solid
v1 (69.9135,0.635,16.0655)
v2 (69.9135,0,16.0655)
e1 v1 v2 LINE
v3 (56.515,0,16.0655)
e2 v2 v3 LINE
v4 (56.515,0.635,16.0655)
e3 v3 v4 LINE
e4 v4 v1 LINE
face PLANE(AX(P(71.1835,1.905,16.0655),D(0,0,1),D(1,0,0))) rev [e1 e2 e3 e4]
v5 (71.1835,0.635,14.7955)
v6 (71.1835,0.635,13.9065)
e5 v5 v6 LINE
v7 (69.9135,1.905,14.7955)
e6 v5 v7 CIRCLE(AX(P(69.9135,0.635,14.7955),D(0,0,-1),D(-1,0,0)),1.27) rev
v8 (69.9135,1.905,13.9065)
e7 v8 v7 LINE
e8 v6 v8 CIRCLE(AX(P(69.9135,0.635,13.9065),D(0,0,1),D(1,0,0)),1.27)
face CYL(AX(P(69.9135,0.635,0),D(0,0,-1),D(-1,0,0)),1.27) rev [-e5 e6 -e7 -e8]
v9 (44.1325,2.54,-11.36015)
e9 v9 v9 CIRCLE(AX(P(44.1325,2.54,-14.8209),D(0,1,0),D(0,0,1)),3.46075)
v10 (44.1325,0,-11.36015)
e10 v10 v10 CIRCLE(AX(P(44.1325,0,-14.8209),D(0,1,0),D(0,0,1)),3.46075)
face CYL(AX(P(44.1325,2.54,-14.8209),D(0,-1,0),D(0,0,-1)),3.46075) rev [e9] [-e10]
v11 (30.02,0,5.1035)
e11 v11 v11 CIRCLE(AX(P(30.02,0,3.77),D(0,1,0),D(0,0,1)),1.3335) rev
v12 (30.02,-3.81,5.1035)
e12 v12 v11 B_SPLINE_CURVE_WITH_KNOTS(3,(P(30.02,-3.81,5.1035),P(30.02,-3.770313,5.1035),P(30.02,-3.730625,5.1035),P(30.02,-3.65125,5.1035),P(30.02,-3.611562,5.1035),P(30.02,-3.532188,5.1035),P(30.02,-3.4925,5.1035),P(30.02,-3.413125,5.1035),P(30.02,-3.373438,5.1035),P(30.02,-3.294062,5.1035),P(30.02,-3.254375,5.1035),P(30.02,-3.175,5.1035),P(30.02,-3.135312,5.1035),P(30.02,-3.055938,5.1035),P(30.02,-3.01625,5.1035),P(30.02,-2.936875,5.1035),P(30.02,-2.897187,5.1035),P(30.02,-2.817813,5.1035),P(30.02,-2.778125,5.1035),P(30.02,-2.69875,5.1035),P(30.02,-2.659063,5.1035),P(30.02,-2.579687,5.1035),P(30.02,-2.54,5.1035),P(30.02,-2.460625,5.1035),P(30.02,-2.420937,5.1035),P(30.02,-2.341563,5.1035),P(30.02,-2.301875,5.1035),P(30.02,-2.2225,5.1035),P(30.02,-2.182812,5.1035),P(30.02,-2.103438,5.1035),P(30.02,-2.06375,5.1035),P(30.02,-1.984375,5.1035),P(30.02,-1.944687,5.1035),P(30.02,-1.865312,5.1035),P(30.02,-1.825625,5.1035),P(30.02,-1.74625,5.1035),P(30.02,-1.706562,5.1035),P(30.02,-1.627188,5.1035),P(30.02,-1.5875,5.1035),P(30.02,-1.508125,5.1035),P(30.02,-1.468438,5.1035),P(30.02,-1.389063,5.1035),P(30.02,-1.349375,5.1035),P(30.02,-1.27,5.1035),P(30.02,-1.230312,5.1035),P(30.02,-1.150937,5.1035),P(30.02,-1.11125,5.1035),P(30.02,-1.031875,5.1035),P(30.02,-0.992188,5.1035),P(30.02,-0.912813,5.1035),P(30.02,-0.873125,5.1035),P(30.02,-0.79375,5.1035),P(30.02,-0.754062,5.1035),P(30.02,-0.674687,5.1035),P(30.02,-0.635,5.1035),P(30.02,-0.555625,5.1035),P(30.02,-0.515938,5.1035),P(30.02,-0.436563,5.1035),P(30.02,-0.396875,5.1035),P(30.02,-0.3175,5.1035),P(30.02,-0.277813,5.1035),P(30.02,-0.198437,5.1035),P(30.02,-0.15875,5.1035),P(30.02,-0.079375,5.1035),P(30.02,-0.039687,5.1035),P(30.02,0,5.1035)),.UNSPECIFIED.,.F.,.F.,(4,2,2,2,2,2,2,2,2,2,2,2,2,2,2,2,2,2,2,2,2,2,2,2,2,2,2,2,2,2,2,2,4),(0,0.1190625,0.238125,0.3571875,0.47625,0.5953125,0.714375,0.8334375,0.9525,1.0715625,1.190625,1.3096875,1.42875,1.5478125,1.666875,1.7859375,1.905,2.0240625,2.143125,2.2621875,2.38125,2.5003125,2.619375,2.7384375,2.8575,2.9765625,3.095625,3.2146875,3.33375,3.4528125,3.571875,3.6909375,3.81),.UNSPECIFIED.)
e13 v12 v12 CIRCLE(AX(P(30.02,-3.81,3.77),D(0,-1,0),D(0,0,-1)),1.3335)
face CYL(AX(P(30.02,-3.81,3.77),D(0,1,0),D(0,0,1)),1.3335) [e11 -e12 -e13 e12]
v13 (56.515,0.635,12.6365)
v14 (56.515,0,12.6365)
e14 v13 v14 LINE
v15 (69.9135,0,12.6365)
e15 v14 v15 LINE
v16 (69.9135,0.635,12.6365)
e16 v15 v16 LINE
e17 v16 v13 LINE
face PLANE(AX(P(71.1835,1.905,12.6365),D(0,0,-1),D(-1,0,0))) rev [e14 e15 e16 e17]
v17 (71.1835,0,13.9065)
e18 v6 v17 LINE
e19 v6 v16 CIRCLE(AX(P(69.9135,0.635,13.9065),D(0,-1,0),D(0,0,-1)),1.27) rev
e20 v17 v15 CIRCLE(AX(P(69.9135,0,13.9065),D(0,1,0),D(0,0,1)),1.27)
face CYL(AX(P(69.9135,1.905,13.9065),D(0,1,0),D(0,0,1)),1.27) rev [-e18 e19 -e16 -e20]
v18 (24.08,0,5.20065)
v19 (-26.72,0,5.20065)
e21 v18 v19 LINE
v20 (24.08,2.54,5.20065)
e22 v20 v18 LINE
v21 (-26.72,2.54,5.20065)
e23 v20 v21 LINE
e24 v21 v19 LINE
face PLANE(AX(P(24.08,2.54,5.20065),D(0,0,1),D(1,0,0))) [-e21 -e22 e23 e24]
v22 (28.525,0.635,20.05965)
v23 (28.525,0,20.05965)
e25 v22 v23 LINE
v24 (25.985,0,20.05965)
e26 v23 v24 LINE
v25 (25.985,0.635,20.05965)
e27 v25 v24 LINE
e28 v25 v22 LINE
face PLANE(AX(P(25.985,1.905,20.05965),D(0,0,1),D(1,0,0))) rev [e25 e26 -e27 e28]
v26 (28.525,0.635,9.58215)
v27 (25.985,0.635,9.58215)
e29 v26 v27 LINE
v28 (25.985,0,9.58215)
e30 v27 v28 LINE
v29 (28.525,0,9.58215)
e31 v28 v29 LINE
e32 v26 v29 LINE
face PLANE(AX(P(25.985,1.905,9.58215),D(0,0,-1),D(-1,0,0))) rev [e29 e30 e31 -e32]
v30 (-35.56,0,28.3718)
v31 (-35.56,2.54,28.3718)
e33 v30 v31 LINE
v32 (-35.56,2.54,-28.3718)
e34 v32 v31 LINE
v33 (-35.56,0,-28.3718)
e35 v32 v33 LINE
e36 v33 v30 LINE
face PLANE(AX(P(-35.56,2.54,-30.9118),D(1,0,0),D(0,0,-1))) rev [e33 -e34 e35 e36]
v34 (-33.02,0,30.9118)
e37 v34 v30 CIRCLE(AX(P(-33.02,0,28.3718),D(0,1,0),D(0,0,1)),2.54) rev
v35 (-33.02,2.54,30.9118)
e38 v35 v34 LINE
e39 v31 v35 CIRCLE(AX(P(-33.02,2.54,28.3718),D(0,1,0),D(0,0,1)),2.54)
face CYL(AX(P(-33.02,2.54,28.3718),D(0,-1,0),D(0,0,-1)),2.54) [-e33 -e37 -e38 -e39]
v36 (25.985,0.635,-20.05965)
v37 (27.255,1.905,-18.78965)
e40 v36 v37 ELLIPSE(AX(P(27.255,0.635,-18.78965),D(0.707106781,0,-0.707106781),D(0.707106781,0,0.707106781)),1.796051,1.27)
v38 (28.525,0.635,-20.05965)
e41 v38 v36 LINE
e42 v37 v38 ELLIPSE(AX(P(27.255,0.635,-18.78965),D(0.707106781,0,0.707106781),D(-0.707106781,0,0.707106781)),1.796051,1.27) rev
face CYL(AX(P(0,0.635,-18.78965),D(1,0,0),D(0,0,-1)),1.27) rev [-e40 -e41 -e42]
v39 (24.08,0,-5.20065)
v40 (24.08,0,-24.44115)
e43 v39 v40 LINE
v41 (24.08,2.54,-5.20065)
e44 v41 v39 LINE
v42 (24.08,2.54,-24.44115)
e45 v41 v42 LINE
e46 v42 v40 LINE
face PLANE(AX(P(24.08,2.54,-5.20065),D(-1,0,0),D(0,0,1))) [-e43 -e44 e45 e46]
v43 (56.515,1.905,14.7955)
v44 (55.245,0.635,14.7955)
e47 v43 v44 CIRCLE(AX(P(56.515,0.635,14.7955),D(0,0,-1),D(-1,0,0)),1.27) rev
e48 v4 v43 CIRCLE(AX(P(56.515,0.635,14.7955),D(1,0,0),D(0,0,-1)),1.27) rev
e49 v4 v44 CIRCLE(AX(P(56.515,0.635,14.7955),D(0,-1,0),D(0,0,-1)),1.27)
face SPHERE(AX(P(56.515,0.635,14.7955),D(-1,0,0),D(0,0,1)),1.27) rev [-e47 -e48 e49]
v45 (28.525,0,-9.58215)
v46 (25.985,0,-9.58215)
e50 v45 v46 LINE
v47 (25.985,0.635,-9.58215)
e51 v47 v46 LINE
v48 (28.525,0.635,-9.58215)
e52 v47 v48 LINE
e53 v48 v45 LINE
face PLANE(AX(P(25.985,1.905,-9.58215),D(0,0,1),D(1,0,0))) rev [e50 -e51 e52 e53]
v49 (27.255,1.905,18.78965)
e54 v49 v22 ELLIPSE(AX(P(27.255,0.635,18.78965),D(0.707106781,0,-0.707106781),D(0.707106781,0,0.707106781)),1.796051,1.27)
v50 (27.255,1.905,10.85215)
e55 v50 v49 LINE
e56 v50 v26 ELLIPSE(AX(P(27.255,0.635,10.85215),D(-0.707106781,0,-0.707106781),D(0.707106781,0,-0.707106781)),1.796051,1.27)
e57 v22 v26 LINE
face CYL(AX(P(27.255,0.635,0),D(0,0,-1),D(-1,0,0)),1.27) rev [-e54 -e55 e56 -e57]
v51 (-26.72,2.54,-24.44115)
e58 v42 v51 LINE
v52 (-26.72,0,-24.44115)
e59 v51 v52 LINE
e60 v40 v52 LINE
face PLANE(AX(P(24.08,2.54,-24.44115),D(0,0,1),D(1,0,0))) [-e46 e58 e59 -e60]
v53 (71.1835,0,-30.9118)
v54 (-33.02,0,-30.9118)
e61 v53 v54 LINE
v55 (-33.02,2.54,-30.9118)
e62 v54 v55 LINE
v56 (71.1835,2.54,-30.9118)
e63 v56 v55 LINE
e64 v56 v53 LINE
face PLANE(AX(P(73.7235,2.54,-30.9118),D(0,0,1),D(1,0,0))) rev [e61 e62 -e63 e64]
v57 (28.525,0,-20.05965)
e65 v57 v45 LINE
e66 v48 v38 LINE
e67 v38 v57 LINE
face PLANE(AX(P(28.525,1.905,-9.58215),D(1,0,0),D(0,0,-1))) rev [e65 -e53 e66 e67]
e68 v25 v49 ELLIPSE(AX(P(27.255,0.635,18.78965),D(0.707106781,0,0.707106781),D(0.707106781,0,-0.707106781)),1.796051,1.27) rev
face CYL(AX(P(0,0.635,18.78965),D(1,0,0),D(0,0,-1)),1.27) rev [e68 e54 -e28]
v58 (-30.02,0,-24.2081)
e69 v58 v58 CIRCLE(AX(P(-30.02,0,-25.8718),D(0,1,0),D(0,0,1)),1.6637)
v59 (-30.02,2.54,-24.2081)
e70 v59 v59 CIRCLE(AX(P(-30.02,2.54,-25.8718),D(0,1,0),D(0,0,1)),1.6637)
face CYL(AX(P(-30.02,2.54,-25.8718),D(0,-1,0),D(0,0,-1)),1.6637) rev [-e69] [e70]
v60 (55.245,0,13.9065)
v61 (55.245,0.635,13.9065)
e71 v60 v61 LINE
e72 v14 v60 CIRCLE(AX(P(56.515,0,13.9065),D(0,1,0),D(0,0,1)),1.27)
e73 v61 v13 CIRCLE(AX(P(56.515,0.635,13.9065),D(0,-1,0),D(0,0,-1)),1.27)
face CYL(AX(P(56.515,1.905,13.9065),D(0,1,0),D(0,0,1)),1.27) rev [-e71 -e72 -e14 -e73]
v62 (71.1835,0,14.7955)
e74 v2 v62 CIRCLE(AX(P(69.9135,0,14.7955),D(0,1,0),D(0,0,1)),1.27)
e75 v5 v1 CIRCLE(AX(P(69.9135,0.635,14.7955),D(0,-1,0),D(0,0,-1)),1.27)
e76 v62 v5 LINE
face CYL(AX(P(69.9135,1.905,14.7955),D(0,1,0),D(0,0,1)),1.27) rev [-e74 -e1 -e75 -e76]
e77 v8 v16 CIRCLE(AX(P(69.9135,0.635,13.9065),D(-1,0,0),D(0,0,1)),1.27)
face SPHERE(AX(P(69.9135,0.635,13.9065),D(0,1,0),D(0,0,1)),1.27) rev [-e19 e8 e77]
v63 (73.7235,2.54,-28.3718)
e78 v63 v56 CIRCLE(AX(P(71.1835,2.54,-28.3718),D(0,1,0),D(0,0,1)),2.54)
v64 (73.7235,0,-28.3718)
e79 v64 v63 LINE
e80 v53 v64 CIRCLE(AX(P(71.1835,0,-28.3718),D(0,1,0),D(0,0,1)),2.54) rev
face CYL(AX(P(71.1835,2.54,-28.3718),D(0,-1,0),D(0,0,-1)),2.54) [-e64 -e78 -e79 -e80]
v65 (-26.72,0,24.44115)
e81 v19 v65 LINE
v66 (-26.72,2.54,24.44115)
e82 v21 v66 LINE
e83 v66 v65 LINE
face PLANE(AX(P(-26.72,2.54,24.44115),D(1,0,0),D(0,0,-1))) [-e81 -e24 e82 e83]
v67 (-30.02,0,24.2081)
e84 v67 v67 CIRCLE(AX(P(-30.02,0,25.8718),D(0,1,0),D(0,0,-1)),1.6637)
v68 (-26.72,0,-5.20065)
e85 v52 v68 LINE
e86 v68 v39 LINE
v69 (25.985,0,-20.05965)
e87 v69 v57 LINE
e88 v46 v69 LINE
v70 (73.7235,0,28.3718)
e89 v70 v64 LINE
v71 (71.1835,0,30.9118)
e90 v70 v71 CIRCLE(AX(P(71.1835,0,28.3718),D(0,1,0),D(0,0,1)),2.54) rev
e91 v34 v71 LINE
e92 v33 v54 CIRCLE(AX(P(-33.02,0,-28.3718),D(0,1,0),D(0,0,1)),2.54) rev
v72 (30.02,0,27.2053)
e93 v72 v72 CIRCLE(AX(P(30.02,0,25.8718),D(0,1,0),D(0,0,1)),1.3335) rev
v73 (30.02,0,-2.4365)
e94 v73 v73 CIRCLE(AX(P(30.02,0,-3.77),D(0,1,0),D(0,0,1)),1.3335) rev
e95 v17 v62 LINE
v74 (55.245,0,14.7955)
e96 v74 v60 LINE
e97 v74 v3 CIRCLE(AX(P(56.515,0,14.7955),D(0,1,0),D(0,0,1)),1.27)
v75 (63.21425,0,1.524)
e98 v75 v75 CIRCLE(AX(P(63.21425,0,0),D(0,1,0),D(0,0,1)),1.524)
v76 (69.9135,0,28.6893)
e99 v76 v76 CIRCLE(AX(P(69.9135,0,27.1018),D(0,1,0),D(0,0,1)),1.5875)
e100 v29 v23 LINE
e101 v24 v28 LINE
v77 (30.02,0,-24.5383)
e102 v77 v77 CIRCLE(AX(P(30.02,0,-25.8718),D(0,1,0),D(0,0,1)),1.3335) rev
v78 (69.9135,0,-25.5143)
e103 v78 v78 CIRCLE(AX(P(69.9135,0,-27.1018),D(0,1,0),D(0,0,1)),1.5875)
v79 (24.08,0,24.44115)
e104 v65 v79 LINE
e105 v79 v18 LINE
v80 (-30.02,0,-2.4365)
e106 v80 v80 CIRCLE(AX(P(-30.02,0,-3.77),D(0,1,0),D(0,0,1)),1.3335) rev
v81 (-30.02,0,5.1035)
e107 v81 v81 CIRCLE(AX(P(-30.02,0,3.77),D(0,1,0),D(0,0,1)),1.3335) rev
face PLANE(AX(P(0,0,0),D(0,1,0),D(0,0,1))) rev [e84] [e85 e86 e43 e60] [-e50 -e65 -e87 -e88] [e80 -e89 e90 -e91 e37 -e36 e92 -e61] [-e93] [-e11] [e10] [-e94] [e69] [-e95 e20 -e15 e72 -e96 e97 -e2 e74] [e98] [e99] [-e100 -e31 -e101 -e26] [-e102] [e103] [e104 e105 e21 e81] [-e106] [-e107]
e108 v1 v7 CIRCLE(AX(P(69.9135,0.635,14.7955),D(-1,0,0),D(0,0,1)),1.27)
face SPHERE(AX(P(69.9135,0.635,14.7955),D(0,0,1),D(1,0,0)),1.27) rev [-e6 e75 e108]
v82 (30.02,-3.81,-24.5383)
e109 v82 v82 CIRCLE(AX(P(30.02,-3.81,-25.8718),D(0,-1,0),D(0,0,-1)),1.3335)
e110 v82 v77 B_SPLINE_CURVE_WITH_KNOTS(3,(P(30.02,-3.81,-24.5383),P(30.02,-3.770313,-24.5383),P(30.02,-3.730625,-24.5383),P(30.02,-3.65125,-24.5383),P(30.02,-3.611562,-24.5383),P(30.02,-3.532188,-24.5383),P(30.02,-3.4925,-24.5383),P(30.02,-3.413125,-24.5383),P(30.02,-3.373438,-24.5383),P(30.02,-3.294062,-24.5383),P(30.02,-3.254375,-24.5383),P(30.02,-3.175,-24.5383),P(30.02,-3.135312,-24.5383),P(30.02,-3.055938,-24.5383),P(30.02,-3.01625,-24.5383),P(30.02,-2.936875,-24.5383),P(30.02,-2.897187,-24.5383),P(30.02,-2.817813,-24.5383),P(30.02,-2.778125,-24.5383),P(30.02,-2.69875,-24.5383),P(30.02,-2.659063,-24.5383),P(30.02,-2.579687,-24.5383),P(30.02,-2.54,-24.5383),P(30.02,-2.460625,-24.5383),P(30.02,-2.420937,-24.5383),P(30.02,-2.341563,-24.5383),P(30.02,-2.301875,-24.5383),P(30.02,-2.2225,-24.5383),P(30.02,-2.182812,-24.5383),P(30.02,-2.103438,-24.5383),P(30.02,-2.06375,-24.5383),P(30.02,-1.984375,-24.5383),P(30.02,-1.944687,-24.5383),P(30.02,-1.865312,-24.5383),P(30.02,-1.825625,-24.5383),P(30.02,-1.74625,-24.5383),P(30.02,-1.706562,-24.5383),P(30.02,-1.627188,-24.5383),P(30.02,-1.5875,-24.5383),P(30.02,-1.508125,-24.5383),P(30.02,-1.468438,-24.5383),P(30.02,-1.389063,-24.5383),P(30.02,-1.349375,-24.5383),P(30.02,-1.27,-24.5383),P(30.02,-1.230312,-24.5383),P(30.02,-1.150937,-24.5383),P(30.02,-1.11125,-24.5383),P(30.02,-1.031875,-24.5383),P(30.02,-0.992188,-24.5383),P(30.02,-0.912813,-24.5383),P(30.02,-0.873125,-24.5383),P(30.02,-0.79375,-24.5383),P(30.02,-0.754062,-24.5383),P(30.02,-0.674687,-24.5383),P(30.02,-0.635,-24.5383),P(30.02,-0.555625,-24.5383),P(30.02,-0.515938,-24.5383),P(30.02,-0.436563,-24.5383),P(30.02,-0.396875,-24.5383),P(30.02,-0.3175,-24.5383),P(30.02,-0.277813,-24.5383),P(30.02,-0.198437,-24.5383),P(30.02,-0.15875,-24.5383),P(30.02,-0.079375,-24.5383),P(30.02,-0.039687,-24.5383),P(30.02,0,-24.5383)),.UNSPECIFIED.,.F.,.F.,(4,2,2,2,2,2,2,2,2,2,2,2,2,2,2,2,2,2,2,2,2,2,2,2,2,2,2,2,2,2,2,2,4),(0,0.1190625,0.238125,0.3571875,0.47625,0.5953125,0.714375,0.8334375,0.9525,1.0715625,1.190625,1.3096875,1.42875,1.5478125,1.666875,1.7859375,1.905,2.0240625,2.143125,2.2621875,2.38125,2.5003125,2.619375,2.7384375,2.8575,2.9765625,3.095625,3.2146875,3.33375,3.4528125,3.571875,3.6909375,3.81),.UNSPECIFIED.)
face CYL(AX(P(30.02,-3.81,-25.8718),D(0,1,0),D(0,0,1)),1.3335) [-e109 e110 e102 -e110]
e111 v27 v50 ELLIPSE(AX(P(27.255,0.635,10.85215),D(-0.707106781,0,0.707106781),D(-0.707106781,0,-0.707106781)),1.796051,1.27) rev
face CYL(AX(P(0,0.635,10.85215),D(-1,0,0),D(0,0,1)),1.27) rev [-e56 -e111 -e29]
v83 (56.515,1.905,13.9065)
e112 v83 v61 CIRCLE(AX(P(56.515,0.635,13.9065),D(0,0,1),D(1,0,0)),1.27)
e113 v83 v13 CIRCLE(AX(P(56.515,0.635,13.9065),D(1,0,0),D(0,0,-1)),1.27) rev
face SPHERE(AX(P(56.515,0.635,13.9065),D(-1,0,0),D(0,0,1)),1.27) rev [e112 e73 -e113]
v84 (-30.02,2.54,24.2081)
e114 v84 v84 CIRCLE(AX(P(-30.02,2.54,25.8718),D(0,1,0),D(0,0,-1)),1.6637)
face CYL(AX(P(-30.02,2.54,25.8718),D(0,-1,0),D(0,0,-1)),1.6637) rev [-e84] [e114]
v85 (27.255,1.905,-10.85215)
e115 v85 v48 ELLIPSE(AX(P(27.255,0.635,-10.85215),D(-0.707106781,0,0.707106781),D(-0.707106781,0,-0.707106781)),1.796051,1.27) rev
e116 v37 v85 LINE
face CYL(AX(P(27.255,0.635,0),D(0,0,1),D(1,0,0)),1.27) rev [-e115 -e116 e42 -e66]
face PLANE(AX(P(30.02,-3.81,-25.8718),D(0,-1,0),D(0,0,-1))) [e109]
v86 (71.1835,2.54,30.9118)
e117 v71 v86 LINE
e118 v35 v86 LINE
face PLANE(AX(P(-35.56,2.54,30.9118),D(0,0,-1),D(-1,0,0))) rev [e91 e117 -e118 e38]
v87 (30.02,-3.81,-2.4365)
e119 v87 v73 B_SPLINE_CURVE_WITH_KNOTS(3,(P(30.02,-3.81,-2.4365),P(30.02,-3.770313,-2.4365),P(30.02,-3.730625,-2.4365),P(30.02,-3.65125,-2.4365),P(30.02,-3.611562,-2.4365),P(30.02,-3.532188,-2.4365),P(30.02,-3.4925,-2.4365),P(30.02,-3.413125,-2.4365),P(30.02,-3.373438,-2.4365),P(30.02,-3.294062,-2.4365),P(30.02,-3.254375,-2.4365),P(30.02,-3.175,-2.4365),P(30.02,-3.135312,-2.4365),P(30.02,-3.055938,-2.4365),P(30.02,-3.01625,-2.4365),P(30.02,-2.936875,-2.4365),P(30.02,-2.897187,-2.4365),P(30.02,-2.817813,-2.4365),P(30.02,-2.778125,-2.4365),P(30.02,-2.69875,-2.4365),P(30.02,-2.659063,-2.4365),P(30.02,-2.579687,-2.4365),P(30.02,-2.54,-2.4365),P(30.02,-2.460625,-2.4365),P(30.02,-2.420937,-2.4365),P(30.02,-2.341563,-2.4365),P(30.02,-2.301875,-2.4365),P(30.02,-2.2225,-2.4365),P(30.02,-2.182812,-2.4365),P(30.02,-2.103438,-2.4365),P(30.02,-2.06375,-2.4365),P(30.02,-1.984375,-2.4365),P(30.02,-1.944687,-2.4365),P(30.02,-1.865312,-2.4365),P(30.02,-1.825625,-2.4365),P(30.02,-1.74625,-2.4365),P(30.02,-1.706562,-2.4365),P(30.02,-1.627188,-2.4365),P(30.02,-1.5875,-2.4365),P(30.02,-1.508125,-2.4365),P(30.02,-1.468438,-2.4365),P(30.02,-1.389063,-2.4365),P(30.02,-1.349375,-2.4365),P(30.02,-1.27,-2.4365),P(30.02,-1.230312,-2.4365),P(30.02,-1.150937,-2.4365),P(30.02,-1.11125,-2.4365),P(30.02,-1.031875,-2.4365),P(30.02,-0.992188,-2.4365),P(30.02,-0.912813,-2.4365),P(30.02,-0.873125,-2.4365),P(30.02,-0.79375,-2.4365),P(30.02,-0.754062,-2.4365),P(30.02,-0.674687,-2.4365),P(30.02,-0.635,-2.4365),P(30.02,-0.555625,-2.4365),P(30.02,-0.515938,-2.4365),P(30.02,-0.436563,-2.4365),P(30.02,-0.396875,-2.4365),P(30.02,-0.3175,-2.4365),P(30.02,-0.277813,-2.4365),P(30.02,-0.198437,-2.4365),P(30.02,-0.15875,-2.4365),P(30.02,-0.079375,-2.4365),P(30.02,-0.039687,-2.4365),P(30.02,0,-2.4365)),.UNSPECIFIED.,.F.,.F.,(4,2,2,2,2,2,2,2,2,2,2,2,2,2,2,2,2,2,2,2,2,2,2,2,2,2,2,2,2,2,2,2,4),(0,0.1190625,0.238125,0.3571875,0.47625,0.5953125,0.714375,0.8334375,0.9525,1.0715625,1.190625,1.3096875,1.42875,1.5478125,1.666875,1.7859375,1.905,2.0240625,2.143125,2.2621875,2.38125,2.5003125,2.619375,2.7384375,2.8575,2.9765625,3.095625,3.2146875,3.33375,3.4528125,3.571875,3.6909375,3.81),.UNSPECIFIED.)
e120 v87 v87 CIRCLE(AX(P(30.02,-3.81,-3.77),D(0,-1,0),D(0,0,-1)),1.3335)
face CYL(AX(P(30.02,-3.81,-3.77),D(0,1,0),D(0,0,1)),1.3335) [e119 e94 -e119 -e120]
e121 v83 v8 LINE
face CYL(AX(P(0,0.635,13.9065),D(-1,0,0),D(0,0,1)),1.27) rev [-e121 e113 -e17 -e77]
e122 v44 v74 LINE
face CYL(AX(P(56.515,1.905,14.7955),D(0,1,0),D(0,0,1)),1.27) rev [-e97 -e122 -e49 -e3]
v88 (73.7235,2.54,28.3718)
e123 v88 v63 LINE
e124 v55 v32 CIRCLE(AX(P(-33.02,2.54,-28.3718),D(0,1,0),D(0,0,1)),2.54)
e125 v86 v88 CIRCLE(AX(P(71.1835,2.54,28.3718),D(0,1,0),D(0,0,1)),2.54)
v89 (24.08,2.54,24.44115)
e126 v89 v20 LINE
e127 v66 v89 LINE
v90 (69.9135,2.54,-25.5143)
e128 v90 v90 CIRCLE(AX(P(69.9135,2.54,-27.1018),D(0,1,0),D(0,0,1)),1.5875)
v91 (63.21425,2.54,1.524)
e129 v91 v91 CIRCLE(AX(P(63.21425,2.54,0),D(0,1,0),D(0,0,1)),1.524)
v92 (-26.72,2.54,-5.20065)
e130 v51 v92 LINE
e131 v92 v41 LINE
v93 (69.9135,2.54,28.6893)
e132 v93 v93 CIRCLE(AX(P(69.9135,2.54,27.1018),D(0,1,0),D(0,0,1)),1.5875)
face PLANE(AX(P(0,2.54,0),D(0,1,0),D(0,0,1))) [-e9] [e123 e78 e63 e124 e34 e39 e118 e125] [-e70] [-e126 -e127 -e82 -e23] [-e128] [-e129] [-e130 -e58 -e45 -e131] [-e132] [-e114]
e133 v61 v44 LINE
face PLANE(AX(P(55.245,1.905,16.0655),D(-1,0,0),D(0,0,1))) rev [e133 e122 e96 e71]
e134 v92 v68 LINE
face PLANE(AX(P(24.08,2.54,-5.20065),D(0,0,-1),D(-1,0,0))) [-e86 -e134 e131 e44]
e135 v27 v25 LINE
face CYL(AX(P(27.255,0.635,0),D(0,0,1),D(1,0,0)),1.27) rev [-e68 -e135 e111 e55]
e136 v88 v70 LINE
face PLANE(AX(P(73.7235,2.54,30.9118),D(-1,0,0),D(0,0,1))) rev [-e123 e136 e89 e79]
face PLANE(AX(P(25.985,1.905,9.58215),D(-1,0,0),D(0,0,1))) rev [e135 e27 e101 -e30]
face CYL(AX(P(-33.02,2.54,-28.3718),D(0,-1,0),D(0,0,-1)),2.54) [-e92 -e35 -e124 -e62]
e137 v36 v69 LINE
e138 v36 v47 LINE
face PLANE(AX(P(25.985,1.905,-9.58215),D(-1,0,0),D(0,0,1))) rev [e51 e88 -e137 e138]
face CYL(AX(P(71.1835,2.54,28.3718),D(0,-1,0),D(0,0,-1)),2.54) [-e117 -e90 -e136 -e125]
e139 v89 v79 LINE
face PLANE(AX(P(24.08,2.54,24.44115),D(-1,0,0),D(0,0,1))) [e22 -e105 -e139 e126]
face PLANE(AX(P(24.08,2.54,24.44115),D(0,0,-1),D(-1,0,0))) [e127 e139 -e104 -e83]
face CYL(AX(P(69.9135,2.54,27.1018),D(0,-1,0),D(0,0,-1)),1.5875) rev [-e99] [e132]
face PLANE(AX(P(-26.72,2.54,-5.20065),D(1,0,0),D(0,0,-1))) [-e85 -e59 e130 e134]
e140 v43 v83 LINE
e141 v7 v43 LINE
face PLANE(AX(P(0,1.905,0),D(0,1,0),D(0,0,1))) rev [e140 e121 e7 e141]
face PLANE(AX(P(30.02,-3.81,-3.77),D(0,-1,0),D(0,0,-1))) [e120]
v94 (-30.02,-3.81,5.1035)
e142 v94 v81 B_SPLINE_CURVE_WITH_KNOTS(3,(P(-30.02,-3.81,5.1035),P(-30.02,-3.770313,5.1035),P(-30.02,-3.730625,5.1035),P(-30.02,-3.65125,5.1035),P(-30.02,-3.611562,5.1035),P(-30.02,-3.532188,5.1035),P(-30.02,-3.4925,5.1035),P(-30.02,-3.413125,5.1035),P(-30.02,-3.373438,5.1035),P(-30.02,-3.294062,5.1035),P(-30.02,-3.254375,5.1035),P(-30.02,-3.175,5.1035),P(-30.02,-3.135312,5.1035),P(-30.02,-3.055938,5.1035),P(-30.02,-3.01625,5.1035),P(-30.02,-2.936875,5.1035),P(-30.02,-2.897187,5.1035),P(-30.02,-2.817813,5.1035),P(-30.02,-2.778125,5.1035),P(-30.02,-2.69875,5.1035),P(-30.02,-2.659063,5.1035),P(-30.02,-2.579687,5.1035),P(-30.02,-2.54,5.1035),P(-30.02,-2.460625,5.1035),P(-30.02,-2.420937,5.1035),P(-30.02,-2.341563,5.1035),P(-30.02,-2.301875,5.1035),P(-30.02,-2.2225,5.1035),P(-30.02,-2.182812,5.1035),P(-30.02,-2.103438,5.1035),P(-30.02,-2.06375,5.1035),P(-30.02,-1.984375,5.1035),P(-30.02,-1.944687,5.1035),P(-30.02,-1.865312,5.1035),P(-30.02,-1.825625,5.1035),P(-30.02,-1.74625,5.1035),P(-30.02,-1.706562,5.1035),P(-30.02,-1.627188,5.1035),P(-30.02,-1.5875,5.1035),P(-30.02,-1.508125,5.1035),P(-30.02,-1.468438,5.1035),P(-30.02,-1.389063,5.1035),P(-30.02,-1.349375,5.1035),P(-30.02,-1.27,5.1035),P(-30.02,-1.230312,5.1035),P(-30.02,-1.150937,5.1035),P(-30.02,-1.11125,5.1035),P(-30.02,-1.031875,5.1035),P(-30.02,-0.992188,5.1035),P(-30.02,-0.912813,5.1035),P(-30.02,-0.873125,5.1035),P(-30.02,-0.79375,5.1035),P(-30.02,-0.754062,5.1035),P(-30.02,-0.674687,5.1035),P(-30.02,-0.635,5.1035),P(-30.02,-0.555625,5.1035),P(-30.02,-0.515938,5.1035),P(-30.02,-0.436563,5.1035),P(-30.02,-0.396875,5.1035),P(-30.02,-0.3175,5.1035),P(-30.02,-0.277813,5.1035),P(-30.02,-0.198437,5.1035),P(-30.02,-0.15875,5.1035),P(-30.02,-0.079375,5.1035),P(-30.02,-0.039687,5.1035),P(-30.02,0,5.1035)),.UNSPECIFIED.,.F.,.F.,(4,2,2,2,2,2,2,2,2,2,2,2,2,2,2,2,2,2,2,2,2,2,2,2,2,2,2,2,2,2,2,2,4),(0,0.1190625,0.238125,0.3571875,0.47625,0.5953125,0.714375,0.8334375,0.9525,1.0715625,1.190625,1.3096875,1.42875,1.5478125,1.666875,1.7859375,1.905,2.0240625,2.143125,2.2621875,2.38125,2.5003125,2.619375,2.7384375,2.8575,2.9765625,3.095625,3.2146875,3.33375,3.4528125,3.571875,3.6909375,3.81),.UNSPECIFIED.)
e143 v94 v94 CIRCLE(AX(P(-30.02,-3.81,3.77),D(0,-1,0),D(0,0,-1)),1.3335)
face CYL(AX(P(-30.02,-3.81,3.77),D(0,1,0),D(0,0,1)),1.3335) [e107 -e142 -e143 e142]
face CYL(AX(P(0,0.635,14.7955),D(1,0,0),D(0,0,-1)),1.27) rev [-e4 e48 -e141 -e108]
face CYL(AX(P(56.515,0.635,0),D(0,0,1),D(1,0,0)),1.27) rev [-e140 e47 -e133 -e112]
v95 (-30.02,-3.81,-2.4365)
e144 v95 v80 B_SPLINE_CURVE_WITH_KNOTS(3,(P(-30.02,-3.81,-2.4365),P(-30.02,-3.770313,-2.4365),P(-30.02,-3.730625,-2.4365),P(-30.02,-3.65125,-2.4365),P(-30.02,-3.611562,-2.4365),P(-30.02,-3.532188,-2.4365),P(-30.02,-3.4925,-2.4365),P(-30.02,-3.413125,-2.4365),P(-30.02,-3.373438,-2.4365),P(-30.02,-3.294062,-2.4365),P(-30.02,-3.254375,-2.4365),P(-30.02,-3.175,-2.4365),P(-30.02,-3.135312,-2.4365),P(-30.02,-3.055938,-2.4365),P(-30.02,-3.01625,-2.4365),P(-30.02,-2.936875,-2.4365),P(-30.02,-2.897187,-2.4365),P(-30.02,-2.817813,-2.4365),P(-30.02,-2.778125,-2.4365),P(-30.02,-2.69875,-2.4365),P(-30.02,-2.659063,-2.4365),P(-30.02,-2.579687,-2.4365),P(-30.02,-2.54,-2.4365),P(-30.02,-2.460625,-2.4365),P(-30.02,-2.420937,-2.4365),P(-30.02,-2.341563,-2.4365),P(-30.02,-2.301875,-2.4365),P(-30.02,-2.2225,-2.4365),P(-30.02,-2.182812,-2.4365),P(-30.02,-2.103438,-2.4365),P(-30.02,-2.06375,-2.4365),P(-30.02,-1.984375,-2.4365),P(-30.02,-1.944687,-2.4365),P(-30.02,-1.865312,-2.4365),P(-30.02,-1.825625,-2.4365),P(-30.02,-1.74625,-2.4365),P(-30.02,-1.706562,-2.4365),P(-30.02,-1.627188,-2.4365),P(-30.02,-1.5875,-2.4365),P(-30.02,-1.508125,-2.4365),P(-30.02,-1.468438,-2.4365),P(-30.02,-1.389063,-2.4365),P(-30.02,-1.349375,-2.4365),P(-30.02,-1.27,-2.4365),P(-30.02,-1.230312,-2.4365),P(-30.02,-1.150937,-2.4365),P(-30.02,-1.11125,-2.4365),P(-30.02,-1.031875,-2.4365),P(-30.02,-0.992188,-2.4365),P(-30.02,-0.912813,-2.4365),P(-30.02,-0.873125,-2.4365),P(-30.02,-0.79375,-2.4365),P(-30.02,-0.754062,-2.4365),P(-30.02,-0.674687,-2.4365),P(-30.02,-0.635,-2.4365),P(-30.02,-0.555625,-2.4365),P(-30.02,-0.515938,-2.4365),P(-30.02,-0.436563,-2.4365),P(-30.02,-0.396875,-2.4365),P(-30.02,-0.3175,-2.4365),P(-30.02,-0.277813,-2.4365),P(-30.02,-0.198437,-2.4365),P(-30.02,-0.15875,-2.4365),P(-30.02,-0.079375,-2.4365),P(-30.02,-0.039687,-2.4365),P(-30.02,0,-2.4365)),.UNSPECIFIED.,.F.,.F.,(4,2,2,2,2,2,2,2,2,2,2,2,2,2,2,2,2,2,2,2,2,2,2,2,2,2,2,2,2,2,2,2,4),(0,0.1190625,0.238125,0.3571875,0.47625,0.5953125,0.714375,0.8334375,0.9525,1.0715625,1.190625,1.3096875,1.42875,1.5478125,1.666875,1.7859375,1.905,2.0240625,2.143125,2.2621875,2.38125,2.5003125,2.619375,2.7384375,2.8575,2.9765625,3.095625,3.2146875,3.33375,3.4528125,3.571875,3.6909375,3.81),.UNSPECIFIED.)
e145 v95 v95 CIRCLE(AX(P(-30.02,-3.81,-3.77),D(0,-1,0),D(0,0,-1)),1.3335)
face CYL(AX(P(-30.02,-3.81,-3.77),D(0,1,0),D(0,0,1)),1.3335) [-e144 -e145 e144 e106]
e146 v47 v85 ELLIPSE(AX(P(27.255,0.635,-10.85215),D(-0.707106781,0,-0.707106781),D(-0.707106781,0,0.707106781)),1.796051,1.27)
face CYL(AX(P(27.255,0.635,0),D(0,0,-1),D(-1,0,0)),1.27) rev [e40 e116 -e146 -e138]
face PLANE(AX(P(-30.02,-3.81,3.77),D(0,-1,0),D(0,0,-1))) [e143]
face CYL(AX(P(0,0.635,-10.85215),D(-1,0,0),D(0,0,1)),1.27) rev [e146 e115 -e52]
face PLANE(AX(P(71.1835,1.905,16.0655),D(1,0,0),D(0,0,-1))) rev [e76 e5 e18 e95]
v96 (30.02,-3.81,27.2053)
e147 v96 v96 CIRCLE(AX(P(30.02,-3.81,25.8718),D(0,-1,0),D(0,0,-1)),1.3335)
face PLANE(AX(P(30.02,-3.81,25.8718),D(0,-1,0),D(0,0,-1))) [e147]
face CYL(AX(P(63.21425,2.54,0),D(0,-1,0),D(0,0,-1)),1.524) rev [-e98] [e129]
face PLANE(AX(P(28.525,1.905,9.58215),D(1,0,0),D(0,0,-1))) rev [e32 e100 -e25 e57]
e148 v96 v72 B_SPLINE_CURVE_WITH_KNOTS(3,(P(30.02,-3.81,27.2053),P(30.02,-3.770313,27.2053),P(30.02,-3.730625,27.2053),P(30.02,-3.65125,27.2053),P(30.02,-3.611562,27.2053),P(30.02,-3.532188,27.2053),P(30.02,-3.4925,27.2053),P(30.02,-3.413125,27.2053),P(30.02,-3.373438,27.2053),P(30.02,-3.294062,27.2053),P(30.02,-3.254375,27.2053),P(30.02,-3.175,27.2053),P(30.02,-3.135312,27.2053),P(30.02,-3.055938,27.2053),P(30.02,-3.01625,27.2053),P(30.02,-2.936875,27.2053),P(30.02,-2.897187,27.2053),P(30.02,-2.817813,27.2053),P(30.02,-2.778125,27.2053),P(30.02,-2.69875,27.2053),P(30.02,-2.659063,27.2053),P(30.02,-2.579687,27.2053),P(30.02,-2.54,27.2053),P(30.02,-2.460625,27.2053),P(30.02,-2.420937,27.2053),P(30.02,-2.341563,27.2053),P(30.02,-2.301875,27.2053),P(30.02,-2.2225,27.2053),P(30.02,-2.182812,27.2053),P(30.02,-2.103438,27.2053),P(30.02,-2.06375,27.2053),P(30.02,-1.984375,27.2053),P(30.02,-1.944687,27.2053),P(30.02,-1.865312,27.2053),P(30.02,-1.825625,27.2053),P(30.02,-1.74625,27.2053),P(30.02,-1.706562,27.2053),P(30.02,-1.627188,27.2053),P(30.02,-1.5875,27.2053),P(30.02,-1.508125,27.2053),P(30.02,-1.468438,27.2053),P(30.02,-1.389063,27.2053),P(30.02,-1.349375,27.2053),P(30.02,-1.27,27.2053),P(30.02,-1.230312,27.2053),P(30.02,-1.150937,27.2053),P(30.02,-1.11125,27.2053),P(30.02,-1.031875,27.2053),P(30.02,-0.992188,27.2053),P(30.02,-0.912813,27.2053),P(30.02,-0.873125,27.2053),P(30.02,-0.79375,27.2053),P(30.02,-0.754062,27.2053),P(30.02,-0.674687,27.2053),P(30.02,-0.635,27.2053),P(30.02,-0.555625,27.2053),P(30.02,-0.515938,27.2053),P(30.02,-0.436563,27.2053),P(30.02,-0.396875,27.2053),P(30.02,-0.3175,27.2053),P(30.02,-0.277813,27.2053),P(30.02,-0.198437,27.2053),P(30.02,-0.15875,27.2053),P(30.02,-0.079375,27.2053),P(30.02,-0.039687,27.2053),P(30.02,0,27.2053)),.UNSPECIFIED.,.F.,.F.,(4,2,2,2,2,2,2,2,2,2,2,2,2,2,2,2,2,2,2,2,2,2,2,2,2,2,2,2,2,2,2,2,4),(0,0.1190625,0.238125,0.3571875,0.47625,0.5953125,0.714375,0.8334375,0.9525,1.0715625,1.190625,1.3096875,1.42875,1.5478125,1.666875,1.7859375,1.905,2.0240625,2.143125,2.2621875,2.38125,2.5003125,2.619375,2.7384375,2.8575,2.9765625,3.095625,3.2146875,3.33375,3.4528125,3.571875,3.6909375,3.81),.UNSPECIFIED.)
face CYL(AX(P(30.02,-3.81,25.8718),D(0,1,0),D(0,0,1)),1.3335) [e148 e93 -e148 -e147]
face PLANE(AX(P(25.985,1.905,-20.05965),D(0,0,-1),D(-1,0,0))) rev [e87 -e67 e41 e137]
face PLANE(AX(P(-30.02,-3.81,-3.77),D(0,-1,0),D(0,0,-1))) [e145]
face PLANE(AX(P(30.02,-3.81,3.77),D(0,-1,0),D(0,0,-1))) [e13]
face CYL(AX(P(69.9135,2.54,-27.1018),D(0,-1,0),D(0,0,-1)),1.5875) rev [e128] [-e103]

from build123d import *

# Parameters (mm, degrees)
SKETCH1_W           = 109.2835
SKETCH1_H           = 61.8236
SKETCH1_R           = 3.46075
SKETCH1_R_2         = 1.6637
SKETCH1_R_3         = 1.524
SKETCH1_R_4         = 1.5875
SKETCH1_W_2         = 50.8
SKETCH1_H_2         = 19.2405
BOSS_EXTRUDE1_DEPTH = 2.54
SKETCH5_W           = 2.54
SKETCH5_H           = 10.4775
SKETCH5_W_2         = 15.9385
SKETCH5_H_2         = 3.429
CUT_EXTRUDE1_DEPTH  = 1.905
FILLET1_R           = 1.27
FILLET2_R           = 2.54
SKETCH6_R           = 1.6637
BOSS_EXTRUDE2_DEPTH = 2.54
SKETCH7_R           = 1.3335
BOSS_EXTRUDE3_DEPTH = 3.81


with BuildPart() as part:
    # Sketch1 → Boss-Extrude1 (new body)
    with BuildSketch(Plane(origin=(0, 0, 0), x_dir=(1, 0, 0), z_dir=(0, 1, 0))):
        with Locations((19.08175, 0)):
            Rectangle(SKETCH1_W, SKETCH1_H)
        with Locations(Location((44.1325, 14.8209, 0), (0, 0, 270))):
            Circle(SKETCH1_R, mode=Mode.SUBTRACT)
        with Locations(Location((-30.02, 25.8718, 0), (0, 0, 270))):
            Circle(SKETCH1_R_2, mode=Mode.SUBTRACT)
        with Locations(Location((30.02, 25.8718, 0), (0, 0, 90))):
            Circle(SKETCH1_R_2, mode=Mode.SUBTRACT)
        with Locations(Location((-30.02, 3.77, 0), (0, 0, 90))):
            Circle(SKETCH1_R_2, mode=Mode.SUBTRACT)
        with Locations(Location((30.02, 3.77, 0), (0, 0, 270))):
            Circle(SKETCH1_R_2, mode=Mode.SUBTRACT)
        with Locations(Location((30.02, -3.77, 0), (0, 0, 90))):
            Circle(SKETCH1_R_2, mode=Mode.SUBTRACT)
        with Locations(Location((-30.02, -3.77, 0), (0, 0, 270))):
            Circle(SKETCH1_R_2, mode=Mode.SUBTRACT)
        with Locations(Location((-30.02, -25.8718, 0), (0, 0, 90))):
            Circle(SKETCH1_R_2, mode=Mode.SUBTRACT)
        with Locations(Location((30.02, -25.8718, 0), (0, 0, 270))):
            Circle(SKETCH1_R_2, mode=Mode.SUBTRACT)
        with Locations(Location((63.21425, 0, 0), (0, 0, 270))):
            Circle(SKETCH1_R_3, mode=Mode.SUBTRACT)
        with Locations(Location((69.9135, 27.1018, 0), (0, 0, 270))):
            Circle(SKETCH1_R_4, mode=Mode.SUBTRACT)
        with Locations(Location((69.9135, -27.1018, 0), (0, 0, 270))):
            Circle(SKETCH1_R_4, mode=Mode.SUBTRACT)
        with Locations((-1.32, 14.8209)):
            Rectangle(SKETCH1_W_2, SKETCH1_H_2, mode=Mode.SUBTRACT)
        with Locations((-1.32, -14.8209)):
            Rectangle(SKETCH1_W_2, SKETCH1_H_2, mode=Mode.SUBTRACT)
    extrude(amount=BOSS_EXTRUDE1_DEPTH)

    # Sketch5 → Cut-Extrude1 (cut)
    with BuildSketch(Plane.XZ):
        with Locations((27.255, -14.8209)):
            Rectangle(SKETCH5_W, SKETCH5_H)
        with Locations((27.255, 14.8209)):
            Rectangle(SKETCH5_W, SKETCH5_H)
        with Locations((63.21425, 14.351)):
            Rectangle(SKETCH5_W_2, SKETCH5_H_2)
    extrude(amount=-CUT_EXTRUDE1_DEPTH, mode=Mode.SUBTRACT)

    # Fillet1
    fillet1_edges = [part.edges().sort_by_distance(p)[0] for p in [
        (25.985, 1.905, -14.8209),
        (27.255, 1.905, -9.58215),
        (28.525, 1.905, -14.8209),
        (27.255, 1.905, -20.05965),
        (25.985, 1.905, 14.8209),
        (27.255, 1.905, 20.05965),
        (28.525, 1.905, 14.8209),
        (27.255, 1.905, 9.58215),
        (71.1835, 1.905, 14.351),
        (71.1835, 0.9525, 16.0655),
        (63.21425, 1.905, 12.6365),
        (71.1835, 0.9525, 12.6365),
        (55.245, 1.905, 14.351),
        (55.245, 0.9525, 12.6365),
        (63.21425, 1.905, 16.0655),
        (55.245, 0.9525, 16.0655),
    ]]
    fillet(fillet1_edges, radius=FILLET1_R - 0.0001)  # a hair under: the kernel refuses the full size

    # Fillet2
    fillet2_edges = [part.edges().sort_by_distance(p)[0] for p in [
        (-35.56, 1.27, -30.9118),
        (73.7235, 1.27, -30.9118),
        (73.7235, 1.27, 30.9118),
        (-35.56, 1.27, 30.9118),
    ]]
    fillet(fillet2_edges, radius=FILLET2_R)

    # Sketch6 → Boss-Extrude2 (add)
    with BuildSketch(Plane.XZ):
        with Locations((-30.02, 3.77)):
            Circle(SKETCH6_R)
        with Locations((-30.02, -3.77)):
            Circle(SKETCH6_R)
        with Locations((30.02, -25.8718)):
            Circle(SKETCH6_R)
        with Locations((30.02, 25.8718)):
            Circle(SKETCH6_R)
        with Locations((30.02, 3.77)):
            Circle(SKETCH6_R)
        with Locations((30.02, -3.77)):
            Circle(SKETCH6_R)
    extrude(amount=-BOSS_EXTRUDE2_DEPTH)

    # Sketch7 → Boss-Extrude3 (add)
    with BuildSketch(Plane.XZ):
        with Locations(Location((-30.02, 3.77, 0), (0, 0, 90))):
            Circle(SKETCH7_R)
        with Locations(Location((-30.02, -3.77, 0), (0, 0, 90))):
            Circle(SKETCH7_R)
        with Locations(Location((30.02, -25.8718, 0), (0, 0, 90))):
            Circle(SKETCH7_R)
        with Locations(Location((30.02, 25.8718, 0), (0, 0, 90))):
            Circle(SKETCH7_R)
        with Locations(Location((30.02, -3.77, 0), (0, 0, 90))):
            Circle(SKETCH7_R)
        with Locations(Location((30.02, 3.77, 0), (0, 0, 90))):
            Circle(SKETCH7_R)
    extrude(amount=BOSS_EXTRUDE3_DEPTH)


solid = part.part
